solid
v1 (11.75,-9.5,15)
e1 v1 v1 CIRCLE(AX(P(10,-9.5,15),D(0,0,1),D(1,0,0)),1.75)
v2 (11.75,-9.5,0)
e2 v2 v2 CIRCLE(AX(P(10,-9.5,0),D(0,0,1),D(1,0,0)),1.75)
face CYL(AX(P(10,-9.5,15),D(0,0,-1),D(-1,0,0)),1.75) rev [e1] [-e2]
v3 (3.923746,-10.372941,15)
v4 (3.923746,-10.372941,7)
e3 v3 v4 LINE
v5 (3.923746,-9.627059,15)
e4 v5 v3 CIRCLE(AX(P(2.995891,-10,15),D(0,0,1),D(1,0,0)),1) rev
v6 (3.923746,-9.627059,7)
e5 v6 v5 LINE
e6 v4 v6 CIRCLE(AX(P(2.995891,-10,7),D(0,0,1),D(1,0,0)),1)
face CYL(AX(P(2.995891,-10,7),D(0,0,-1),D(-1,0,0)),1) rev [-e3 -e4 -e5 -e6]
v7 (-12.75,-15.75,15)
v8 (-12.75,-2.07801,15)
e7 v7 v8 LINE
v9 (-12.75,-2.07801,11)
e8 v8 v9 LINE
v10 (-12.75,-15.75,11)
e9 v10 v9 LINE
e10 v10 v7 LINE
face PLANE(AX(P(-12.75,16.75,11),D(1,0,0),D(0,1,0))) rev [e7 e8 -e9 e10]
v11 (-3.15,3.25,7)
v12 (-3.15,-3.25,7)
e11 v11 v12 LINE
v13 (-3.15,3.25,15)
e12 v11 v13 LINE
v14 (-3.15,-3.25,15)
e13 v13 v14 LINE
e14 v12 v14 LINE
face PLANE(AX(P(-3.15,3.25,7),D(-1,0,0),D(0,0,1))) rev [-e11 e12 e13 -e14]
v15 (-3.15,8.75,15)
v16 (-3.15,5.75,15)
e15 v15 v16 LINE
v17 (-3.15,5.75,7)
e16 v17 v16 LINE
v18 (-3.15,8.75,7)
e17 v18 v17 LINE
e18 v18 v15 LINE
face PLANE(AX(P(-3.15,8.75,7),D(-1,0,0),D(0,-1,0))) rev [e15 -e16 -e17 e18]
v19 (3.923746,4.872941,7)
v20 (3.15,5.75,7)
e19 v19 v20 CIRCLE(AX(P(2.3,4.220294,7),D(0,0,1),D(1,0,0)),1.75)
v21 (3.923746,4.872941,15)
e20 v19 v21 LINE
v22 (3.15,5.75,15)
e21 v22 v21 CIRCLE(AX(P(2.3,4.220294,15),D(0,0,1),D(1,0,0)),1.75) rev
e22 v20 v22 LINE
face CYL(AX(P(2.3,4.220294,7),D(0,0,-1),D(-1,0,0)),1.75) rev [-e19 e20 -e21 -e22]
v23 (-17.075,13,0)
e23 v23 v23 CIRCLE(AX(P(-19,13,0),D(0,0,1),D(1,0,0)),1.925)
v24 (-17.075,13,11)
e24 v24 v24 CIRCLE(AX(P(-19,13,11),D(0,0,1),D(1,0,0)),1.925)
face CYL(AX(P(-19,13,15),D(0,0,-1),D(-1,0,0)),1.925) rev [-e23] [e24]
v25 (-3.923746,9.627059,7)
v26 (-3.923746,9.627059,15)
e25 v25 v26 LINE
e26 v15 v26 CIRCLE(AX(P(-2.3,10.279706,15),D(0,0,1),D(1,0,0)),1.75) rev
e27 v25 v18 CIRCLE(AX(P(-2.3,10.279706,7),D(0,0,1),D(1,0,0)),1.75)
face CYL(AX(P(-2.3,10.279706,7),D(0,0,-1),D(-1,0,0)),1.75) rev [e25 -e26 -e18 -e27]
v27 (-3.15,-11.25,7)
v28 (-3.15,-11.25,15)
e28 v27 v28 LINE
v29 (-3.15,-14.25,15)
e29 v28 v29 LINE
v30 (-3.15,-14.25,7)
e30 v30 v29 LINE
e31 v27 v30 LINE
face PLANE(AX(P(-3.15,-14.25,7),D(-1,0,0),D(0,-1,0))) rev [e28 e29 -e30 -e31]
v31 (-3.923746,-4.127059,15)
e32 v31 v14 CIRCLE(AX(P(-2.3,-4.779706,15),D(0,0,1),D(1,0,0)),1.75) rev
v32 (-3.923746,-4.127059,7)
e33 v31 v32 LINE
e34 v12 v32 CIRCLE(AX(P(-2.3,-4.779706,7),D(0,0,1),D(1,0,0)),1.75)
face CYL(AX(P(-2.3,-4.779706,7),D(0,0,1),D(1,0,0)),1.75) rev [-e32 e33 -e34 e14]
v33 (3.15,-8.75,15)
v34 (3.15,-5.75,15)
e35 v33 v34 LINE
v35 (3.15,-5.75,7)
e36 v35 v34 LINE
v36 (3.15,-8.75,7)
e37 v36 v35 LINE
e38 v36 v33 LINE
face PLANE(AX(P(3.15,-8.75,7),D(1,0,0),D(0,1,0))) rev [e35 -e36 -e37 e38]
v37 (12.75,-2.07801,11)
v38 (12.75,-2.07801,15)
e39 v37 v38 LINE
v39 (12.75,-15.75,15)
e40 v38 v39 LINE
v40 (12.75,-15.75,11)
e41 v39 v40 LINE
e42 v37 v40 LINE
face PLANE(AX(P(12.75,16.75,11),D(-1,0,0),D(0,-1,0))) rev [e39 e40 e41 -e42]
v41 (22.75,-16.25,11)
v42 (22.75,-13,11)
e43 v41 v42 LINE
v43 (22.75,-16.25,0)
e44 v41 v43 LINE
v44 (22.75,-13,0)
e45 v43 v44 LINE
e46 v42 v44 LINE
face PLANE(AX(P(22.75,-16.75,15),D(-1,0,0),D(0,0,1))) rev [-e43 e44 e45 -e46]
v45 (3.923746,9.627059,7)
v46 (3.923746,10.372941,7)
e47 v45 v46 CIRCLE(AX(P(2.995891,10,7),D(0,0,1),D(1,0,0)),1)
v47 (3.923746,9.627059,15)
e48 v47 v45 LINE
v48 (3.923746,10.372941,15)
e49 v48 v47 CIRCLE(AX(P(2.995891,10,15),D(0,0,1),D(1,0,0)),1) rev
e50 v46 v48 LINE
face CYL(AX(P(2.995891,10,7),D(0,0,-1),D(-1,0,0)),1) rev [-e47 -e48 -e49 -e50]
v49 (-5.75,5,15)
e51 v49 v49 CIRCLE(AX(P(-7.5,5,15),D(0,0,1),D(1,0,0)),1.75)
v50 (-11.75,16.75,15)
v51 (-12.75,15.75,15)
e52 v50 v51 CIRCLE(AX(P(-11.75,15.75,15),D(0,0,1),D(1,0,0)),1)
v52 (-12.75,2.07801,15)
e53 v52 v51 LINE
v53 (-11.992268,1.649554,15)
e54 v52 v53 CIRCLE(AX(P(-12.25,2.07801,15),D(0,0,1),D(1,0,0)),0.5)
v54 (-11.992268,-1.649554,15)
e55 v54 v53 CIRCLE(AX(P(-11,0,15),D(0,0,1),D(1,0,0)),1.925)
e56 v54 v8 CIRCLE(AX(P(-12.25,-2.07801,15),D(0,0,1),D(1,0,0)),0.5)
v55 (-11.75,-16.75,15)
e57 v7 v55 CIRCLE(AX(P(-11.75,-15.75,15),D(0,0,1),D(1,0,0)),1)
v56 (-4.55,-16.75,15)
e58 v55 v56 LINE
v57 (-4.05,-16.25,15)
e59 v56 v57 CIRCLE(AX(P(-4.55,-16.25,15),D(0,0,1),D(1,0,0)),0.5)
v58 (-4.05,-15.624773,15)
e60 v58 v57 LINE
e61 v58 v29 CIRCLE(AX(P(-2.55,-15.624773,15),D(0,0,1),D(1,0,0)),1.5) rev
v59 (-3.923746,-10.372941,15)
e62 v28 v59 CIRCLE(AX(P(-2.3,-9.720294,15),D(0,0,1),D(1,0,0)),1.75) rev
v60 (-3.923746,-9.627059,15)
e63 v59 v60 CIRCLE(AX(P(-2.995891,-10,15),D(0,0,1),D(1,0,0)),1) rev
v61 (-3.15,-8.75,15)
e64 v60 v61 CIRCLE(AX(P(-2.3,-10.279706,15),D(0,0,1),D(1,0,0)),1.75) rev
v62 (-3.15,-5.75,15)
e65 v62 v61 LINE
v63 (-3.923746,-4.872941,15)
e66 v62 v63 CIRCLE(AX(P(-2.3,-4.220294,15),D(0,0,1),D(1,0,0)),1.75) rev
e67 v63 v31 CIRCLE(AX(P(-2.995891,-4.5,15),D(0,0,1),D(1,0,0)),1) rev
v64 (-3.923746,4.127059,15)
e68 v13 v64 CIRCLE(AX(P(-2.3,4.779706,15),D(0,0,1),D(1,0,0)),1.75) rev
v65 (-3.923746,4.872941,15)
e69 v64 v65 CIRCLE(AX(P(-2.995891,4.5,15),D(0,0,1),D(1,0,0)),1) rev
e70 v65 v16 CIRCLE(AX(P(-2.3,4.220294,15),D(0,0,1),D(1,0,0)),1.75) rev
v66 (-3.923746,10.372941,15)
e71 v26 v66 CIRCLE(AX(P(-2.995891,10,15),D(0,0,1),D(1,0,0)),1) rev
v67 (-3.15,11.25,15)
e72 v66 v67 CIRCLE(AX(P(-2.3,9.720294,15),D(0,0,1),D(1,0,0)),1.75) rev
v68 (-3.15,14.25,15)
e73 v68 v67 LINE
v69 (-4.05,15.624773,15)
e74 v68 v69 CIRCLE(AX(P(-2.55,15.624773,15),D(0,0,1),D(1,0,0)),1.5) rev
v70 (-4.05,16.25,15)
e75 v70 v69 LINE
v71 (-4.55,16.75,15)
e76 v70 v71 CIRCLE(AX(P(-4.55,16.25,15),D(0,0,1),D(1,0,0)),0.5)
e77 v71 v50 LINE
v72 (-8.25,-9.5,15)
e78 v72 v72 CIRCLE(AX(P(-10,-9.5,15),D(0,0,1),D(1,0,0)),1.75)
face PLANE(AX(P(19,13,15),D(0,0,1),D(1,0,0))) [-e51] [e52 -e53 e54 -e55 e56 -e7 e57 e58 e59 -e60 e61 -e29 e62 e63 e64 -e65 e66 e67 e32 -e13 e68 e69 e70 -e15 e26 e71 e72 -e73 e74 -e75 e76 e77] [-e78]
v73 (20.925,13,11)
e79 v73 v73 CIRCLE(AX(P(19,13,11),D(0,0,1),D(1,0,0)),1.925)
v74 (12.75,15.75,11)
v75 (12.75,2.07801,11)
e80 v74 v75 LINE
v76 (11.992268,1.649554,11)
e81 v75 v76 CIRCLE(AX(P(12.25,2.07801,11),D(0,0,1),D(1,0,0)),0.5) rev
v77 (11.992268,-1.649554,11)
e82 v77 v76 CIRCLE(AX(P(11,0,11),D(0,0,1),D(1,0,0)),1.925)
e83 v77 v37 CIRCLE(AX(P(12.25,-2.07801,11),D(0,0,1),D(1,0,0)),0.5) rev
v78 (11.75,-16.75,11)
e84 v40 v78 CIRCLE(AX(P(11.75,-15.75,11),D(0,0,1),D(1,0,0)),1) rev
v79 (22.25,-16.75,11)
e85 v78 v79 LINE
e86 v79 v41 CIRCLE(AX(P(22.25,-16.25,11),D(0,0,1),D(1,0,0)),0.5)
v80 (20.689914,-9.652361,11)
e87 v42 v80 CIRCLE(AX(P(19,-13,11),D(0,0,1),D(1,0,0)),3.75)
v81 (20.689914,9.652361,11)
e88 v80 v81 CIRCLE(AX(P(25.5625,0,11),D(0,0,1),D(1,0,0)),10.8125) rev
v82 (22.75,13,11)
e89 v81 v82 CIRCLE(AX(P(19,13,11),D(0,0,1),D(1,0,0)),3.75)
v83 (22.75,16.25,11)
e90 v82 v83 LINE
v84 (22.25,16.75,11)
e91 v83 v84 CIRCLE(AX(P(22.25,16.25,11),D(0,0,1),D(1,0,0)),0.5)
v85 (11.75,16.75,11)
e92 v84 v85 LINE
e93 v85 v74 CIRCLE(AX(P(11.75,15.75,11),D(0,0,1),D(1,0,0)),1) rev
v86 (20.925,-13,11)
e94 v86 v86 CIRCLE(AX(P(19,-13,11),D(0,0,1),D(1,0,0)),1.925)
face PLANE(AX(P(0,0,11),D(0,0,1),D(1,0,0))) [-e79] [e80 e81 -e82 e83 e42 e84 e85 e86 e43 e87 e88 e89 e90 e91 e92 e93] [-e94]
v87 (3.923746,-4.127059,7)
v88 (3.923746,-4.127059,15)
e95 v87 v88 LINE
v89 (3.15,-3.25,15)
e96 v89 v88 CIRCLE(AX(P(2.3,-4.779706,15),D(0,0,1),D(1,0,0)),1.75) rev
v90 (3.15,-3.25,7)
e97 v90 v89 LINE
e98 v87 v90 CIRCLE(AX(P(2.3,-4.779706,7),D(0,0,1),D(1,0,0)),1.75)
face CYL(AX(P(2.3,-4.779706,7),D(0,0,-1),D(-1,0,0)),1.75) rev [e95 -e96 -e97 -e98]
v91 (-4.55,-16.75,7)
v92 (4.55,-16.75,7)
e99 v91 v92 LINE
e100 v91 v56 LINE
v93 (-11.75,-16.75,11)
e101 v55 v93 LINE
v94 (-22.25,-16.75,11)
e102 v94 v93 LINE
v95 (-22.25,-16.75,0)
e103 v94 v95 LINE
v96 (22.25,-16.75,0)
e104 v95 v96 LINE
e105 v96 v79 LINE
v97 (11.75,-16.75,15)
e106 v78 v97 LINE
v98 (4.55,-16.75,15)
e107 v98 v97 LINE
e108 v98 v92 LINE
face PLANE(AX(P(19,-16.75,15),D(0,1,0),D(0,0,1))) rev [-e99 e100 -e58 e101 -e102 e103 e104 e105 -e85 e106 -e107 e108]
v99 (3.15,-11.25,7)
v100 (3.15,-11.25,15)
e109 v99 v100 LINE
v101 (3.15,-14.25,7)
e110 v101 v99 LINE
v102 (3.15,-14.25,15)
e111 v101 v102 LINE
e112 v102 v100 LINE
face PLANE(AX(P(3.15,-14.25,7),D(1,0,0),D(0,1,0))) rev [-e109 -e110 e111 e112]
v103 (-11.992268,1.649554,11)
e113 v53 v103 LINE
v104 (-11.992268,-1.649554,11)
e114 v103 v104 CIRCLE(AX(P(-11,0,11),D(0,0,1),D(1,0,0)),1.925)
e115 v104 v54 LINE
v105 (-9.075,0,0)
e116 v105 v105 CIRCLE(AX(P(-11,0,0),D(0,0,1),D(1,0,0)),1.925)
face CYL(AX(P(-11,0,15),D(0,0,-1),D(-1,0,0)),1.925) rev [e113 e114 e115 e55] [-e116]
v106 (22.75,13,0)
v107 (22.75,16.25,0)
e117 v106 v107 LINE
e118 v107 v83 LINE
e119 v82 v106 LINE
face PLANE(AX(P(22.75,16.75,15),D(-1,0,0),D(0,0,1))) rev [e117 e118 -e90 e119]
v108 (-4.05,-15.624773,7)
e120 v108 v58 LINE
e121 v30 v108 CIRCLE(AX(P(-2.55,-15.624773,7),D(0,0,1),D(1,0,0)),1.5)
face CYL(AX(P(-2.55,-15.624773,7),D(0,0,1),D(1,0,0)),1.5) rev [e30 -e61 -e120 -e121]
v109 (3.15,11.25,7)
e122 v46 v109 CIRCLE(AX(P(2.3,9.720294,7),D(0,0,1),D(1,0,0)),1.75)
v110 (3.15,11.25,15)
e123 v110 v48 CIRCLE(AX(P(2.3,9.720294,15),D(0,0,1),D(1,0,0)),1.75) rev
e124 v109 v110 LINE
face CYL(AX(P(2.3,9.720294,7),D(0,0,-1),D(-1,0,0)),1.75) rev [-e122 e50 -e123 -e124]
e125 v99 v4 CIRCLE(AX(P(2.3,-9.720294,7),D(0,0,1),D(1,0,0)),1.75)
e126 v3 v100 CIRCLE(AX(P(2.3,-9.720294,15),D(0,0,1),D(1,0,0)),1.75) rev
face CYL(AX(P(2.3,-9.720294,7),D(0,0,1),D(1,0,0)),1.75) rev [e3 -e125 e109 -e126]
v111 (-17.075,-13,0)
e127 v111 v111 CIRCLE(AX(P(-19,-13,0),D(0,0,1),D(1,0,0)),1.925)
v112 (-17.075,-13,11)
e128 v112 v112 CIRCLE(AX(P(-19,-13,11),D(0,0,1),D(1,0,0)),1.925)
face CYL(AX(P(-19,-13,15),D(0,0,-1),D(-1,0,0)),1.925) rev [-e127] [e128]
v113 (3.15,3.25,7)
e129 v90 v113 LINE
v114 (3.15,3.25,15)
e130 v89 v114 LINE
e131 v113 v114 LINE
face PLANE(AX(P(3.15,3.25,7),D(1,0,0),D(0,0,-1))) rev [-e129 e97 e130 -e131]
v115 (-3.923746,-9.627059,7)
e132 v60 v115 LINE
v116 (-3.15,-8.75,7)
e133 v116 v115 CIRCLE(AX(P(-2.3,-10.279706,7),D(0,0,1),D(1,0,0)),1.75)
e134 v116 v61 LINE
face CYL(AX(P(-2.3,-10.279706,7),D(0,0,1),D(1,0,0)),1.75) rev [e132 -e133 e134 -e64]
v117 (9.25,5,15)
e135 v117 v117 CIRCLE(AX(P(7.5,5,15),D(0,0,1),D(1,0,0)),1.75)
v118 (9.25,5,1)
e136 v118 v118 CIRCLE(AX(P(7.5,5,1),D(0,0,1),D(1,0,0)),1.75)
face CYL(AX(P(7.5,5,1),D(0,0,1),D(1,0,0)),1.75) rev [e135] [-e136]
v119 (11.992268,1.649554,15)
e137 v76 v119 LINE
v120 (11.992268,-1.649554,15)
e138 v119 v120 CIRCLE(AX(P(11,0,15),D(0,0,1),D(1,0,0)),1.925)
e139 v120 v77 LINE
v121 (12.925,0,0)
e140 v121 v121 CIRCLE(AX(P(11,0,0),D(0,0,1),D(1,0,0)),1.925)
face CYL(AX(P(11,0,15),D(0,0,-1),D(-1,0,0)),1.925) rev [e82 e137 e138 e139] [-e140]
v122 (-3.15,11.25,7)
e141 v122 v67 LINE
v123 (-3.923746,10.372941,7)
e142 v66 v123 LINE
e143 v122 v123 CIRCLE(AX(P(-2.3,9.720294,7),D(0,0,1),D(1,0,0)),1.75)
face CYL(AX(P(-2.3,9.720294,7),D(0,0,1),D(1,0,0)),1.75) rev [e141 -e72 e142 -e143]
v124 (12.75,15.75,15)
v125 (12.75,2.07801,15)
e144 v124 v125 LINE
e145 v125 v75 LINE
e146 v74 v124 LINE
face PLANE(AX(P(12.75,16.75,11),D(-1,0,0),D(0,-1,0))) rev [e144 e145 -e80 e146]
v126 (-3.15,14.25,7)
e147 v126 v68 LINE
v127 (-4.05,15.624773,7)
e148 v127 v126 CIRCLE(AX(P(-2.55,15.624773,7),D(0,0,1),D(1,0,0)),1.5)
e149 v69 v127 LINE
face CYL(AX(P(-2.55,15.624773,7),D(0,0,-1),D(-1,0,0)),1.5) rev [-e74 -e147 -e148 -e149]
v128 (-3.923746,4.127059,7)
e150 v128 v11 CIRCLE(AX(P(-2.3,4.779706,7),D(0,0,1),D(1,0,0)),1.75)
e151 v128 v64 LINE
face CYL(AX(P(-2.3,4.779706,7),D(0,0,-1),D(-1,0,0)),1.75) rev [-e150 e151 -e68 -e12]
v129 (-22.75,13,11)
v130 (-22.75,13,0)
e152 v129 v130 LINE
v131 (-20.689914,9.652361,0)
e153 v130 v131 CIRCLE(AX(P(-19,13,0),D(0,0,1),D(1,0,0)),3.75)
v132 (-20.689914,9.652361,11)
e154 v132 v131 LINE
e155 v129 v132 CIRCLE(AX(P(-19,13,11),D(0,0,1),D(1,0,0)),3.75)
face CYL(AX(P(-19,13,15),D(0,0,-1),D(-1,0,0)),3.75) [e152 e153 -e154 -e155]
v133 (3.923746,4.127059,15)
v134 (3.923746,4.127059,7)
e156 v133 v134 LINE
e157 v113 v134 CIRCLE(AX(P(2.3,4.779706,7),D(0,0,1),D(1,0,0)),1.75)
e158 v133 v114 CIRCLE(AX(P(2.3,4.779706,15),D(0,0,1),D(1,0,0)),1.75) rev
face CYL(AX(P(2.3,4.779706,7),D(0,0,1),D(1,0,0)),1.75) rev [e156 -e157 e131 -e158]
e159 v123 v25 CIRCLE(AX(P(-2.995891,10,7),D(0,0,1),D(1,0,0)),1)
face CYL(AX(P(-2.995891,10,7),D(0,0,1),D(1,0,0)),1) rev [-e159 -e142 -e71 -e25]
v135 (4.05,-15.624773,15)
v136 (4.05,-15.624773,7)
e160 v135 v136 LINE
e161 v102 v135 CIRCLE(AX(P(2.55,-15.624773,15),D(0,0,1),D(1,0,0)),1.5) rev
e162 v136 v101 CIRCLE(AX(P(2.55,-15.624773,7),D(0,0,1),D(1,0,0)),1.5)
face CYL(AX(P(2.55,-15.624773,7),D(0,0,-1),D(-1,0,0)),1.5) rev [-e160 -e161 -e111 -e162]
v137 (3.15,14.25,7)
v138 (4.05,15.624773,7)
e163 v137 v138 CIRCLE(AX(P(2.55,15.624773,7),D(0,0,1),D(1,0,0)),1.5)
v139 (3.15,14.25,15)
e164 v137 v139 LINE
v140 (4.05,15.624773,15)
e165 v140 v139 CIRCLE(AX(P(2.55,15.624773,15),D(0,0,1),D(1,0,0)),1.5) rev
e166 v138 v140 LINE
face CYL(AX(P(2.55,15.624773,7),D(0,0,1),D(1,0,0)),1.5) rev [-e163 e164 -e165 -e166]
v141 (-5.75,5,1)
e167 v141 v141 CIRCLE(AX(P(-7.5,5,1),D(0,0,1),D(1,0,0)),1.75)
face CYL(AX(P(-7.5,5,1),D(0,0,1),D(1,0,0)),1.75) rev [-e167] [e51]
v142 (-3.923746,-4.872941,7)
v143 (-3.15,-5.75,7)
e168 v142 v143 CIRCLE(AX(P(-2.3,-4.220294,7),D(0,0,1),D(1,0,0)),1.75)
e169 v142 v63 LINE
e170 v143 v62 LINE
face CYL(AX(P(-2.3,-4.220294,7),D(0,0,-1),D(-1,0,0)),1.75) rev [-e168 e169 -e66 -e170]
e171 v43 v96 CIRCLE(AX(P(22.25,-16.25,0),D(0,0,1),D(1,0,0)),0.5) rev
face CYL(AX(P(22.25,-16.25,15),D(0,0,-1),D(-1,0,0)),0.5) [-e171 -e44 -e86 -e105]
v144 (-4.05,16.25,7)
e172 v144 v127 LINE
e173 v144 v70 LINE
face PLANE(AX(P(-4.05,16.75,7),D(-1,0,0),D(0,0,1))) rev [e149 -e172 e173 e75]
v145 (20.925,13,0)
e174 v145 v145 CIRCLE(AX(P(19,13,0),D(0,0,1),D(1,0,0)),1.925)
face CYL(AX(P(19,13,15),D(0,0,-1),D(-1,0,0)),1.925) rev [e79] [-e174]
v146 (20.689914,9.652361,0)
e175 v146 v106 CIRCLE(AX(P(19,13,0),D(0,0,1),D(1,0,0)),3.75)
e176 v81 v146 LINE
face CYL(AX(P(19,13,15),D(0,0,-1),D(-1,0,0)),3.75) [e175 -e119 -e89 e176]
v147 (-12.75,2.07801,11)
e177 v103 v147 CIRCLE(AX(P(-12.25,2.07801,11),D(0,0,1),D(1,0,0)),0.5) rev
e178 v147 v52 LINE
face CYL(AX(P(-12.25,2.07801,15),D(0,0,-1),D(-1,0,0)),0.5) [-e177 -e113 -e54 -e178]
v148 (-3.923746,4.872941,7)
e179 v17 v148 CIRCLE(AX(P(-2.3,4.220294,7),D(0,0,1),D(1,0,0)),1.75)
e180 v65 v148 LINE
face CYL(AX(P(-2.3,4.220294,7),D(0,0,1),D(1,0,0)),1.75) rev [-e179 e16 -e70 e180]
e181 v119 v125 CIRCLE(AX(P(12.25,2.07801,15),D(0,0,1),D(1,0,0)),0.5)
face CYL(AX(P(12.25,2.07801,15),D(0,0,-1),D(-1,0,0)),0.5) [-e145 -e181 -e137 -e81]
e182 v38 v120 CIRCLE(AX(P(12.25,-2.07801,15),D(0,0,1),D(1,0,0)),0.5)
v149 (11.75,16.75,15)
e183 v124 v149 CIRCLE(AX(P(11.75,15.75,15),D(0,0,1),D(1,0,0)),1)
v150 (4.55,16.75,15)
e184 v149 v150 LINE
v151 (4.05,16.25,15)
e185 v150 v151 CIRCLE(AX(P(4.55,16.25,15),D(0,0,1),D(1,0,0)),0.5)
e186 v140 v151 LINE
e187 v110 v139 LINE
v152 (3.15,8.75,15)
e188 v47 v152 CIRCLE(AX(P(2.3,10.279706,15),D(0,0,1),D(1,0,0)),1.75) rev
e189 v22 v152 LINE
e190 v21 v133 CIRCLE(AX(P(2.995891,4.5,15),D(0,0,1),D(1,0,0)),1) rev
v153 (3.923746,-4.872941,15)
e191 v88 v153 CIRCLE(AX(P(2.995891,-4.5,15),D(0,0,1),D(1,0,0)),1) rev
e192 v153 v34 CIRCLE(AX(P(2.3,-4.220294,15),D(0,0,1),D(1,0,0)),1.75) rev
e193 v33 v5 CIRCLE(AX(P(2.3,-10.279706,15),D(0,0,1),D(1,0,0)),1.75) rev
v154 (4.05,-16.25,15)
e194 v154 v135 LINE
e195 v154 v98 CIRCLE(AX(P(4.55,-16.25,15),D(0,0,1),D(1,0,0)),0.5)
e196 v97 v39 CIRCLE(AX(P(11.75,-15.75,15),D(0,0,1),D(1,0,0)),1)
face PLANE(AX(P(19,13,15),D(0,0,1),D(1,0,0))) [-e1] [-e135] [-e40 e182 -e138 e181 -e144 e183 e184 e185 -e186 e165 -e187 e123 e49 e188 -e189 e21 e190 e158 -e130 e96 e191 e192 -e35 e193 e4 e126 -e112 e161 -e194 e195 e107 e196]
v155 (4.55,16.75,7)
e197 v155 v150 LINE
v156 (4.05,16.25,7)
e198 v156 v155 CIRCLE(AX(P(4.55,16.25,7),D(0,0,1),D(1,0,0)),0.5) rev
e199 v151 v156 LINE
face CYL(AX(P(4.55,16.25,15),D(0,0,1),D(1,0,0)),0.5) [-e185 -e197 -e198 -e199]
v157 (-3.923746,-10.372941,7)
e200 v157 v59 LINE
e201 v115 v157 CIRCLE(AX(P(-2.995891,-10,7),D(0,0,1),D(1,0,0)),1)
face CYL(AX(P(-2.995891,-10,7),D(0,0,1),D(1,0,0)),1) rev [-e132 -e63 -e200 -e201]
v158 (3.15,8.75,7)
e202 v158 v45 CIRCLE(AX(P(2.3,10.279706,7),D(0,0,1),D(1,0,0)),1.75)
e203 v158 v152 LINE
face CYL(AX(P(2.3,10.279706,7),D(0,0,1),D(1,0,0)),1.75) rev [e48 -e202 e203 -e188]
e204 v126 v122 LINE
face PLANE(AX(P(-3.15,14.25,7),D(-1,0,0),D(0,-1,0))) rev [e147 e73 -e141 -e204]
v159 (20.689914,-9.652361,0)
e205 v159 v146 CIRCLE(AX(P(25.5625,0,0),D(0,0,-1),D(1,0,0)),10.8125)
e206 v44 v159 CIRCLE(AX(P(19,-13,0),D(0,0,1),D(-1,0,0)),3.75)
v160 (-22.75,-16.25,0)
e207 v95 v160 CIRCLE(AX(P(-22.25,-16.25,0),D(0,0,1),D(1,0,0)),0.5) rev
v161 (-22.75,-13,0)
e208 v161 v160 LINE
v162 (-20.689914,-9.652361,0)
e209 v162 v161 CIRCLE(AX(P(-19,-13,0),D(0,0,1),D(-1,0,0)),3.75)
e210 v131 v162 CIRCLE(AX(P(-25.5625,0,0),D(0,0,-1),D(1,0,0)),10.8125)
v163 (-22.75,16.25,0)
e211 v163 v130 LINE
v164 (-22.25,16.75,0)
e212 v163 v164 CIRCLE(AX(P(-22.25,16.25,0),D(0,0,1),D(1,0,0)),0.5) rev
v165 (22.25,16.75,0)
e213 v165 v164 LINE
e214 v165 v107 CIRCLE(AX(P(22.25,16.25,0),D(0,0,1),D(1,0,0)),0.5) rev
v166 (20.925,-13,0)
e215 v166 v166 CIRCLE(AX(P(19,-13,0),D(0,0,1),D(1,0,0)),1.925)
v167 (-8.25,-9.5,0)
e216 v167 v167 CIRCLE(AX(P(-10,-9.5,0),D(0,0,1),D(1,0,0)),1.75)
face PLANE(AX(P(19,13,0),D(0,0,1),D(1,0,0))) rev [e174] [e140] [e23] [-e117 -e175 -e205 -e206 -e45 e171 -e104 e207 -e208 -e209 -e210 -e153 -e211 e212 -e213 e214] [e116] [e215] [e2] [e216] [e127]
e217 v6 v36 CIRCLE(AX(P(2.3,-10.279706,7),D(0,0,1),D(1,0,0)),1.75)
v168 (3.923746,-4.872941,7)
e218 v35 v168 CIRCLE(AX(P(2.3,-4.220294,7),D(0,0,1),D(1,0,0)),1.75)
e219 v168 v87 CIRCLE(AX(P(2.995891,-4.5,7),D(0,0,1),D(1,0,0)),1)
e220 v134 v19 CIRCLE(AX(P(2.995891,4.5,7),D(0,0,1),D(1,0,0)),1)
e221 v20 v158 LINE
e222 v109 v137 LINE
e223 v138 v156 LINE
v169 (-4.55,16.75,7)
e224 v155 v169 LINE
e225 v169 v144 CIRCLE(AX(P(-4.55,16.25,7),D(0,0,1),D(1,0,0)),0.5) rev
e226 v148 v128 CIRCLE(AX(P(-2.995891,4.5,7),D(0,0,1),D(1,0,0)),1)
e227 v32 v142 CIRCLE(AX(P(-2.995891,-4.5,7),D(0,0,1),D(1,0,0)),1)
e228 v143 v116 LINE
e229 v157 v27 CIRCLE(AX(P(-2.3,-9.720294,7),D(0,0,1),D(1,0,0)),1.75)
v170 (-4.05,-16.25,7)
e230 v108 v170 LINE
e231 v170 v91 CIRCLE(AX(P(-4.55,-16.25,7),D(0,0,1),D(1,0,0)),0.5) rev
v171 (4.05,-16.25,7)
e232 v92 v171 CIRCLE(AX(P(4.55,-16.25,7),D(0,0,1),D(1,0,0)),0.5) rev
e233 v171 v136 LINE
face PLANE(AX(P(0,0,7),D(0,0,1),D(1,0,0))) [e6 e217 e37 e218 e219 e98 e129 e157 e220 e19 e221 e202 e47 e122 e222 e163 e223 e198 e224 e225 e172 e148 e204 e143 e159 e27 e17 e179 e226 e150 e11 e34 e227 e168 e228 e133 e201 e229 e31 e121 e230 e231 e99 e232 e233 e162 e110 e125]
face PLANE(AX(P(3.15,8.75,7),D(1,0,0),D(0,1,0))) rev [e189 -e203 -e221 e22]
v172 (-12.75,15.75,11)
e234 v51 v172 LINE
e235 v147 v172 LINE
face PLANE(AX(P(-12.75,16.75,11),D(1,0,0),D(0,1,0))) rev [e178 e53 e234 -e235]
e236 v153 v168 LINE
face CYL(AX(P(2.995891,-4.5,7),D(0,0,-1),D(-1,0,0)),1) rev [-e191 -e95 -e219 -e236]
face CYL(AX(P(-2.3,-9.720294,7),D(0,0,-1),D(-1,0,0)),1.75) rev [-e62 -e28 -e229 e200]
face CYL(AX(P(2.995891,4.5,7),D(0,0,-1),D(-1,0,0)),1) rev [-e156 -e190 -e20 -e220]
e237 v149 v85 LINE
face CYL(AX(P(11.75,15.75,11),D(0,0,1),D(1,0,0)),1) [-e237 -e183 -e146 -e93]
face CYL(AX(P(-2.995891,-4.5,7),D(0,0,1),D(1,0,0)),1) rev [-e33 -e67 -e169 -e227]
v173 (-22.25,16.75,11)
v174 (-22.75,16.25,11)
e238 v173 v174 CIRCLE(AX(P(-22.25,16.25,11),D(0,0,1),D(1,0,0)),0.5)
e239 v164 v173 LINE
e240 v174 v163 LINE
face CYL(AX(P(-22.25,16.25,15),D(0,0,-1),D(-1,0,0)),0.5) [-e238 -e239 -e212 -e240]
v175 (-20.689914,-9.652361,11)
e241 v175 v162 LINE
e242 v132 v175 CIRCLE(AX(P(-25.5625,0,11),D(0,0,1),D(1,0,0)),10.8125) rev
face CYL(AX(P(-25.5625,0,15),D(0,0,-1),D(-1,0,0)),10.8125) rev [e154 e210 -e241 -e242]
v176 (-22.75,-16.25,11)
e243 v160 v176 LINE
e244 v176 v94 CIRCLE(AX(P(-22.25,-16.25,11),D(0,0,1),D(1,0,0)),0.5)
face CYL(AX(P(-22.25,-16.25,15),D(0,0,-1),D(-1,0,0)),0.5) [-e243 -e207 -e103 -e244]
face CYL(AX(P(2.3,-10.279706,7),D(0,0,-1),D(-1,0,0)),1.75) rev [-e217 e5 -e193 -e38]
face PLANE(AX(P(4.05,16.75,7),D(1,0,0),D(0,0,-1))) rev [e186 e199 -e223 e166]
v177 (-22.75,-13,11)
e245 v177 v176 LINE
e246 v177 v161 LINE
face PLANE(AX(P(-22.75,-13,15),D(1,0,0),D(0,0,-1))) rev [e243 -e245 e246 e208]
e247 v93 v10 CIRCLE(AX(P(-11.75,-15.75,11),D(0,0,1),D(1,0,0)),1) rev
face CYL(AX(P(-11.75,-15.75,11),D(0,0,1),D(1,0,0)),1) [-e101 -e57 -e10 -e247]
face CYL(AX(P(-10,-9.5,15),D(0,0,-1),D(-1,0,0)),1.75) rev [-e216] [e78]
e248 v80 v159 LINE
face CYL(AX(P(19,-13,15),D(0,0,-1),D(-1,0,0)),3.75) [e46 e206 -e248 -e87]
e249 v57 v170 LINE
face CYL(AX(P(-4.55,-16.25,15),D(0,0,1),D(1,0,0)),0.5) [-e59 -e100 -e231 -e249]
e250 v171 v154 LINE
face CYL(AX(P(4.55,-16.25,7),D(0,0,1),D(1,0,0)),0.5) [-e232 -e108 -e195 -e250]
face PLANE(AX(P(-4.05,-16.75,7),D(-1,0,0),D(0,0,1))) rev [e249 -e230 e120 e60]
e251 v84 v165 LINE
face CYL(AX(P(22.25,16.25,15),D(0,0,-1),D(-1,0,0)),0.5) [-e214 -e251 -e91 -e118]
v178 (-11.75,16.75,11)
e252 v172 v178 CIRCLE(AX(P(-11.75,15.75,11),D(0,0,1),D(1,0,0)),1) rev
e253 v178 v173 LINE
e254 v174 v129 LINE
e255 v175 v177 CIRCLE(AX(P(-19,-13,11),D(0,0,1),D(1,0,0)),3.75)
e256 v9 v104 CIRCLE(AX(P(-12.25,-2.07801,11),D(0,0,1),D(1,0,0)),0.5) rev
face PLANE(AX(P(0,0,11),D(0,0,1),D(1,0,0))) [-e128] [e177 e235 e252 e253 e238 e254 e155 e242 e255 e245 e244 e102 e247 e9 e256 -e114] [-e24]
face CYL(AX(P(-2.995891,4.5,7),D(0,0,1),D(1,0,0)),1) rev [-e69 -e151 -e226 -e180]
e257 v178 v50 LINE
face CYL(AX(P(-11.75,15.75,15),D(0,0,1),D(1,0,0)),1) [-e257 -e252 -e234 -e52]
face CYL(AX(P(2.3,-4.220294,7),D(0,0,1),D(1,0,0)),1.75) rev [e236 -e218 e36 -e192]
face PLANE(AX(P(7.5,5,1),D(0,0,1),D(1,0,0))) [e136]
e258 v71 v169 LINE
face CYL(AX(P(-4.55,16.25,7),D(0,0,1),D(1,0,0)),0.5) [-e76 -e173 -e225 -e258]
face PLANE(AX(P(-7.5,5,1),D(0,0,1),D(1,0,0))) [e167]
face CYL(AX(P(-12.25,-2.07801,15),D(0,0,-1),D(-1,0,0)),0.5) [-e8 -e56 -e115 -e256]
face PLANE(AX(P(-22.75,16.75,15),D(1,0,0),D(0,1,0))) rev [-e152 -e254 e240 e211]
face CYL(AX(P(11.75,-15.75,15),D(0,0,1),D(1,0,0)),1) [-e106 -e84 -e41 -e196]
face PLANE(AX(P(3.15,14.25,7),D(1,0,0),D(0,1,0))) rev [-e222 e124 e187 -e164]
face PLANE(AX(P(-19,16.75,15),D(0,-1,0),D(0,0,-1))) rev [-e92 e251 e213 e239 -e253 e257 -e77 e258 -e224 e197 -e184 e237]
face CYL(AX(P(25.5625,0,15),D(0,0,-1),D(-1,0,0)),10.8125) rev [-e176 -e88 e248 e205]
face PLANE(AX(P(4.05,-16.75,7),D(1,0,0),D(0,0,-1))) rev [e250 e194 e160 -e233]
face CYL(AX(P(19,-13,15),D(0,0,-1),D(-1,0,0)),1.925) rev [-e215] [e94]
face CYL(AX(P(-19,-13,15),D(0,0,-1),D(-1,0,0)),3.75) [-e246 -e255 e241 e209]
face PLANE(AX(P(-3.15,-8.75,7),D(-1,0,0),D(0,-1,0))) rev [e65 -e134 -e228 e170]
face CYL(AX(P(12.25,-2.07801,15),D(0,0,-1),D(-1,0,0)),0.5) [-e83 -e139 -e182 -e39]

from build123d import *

# Parameters (mm, degrees)
SKETCH1_R           = 1.75
SKETCH1_R_2         = 1.925
BOSS_EXTRUDE1_DEPTH = 15
CUT_EXTRUDE1_DEPTH  = 8
SKETCH5_W           = 11
SKETCH5_H           = 33.5
CUT_EXTRUDE6_DEPTH  = 4
SKETCH8_R           = 1.75
CUT_EXTRUDE9_DEPTH  = 14
FILLET1_R           = 1.75
FILLET2_R           = 1
FILLET3_R           = 0.5
FILLET4_R           = 1.5


with BuildPart() as part:
    # Sketch1 → Boss-Extrude1 (new body)
    with BuildSketch(Plane.XY):
        with BuildLine():
            Line((-19, 16.75), (19, 16.75))
            Line((19, 16.75), (22.75, 16.75))
            Line((22.75, 16.75), (22.75, 13))
            ThreePointArc((22.75, 13), (22.193718688, 11.034634654), (20.689914163, 9.652360515))
            ThreePointArc((20.689914163, 9.652360515), (14.75, 0), (20.689914163, -9.652360515))
            ThreePointArc((20.689914163, -9.652360515), (22.193718688, -11.034634654), (22.75, -13))
            Line((22.75, -13), (22.75, -16.75))
            Line((22.75, -16.75), (19, -16.75))
            Line((19, -16.75), (-19, -16.75))
            Line((-19, -16.75), (-22.75, -16.75))
            Line((-22.75, -16.75), (-22.75, -13))
            ThreePointArc((-22.75, -13), (-22.193718688, -11.034634654), (-20.689914163, -9.652360515))
            ThreePointArc((-20.689914163, -9.652360515), (-14.75, 0), (-20.689914163, 9.652360515))
            ThreePointArc((-20.689914163, 9.652360515), (-22.193718688, 11.034634654), (-22.75, 13))
            Line((-22.75, 13), (-22.75, 16.75))
            Line((-22.75, 16.75), (-19, 16.75))
        make_face()
        with Locations((-10, -9.5)):
            Circle(SKETCH1_R, mode=Mode.SUBTRACT)
        with Locations((10, -9.5)):
            Circle(SKETCH1_R, mode=Mode.SUBTRACT)
        with Locations((19, 13)):
            Circle(SKETCH1_R_2, mode=Mode.SUBTRACT)
        with Locations((-19, 13)):
            Circle(SKETCH1_R_2, mode=Mode.SUBTRACT)
        with Locations((-19, -13)):
            Circle(SKETCH1_R_2, mode=Mode.SUBTRACT)
        with Locations((19, -13)):
            Circle(SKETCH1_R_2, mode=Mode.SUBTRACT)
        with Locations((-11, 0)):
            Circle(SKETCH1_R_2, mode=Mode.SUBTRACT)
        with Locations((11, 0)):
            Circle(SKETCH1_R_2, mode=Mode.SUBTRACT)
    extrude(amount=BOSS_EXTRUDE1_DEPTH)

    # Sketch2 → Cut-Extrude1 (cut)
    with BuildSketch(Plane.XY.offset(15)):
        Polygon((-4.049999999, 16.75), (-4.049999999, 14.25), (-3.149999999, 14.25), (-3.149999999, 11.25), (-4.049999999, 11.25), (-4.049999999, 8.75), (-3.149999999, 8.75), (-3.149999999, 5.75), (-4.049999999, 5.75), (-4.049999999, 3.25), (-3.149999999, 3.25), (-3.149999999, -3.25), (-4.049999999, -3.25), (-4.049999999, -5.75), (-3.149999999, -5.75), (-3.149999999, -8.75), (-4.049999999, -8.75), (-4.049999999, -11.25), (-3.149999999, -11.25), (-3.149999999, -14.25), (-4.049999999, -14.25), (-4.049999999, -16.75), (4.050000001, -16.75), (4.050000001, -14.25), (3.150000001, -14.25), (3.150000001, -11.25), (4.050000001, -11.25), (4.050000001, -8.75), (3.150000001, -8.75), (3.150000001, -5.75), (4.050000001, -5.75), (4.050000001, -3.25), (3.150000001, -3.25), (3.150000001, 3.25), (4.050000001, 3.25), (4.050000001, 5.75), (3.150000001, 5.75), (3.150000001, 8.75), (4.050000001, 8.75), (4.050000001, 11.25), (3.150000001, 11.25), (3.150000001, 14.25), (4.050000001, 14.25), (4.050000001, 16.75), align=None)
    extrude(amount=-CUT_EXTRUDE1_DEPTH, mode=Mode.SUBTRACT)

    # Sketch5 → Cut-Extrude6 (cut)
    with BuildSketch(Plane.XY.offset(15)):
        with Locations((-18.25, 0)):
            Rectangle(SKETCH5_W, SKETCH5_H)
        with Locations((18.25, 0)):
            Rectangle(SKETCH5_W, SKETCH5_H)
    extrude(amount=-CUT_EXTRUDE6_DEPTH, mode=Mode.SUBTRACT)

    # Sketch8 → Cut-Extrude9 (cut)
    with BuildSketch(Plane.XY.offset(15)):
        with Locations((7.5, 5)):
            Circle(SKETCH8_R)
        with Locations((-7.5, 5)):
            Circle(SKETCH8_R)
    extrude(amount=-CUT_EXTRUDE9_DEPTH, mode=Mode.SUBTRACT)

    # Fillet1
    # the kernel refuses this fillet: 1.75 mm, written as the material it adds along each edge
    with BuildSketch(Plane(origin=(-4.049999999, 11.25, 15), x_dir=(1, 0, 0), z_dir=(0, 0, -1)), Plane(origin=(-4.049999999, 5.75, 15), x_dir=(1, 0, 0), z_dir=(0, 0, -1)), Plane(origin=(-4.049999999, -3.25, 15), x_dir=(1, 0, 0), z_dir=(0, 0, -1)), Plane(origin=(-4.049999999, -8.75, 15), x_dir=(1, 0, 0), z_dir=(0, 0, -1)), Plane(origin=(4.050000001, -11.25, 15), x_dir=(-1, 0, 0), z_dir=(0, 0, -1))) as fillet1_piece_1:
        with BuildLine():
            CenterArc((1.75, 1.529705854), FILLET1_R, 180, 60.940718932)
            Line((0, 1.529705854), (-0.035, 1.529705854))
            Line((-0.035, 1.529705854), (-0.035, 0))
            Line((-0.035, 0), (0, -0.035))
            ThreePointArc((0, -0.035), (0.45, -0.035), (0.883, -0.030594117))
            Line((0.883, -0.030594117), (0.9, 0))
        make_face()
    extrude(amount=11.824264635)
    with BuildSketch(Plane(origin=(4.050000001, 11.25, 15), x_dir=(-1, 0, 0), z_dir=(0, 0, -1)), Plane(origin=(4.050000001, 5.75, 15), x_dir=(-1, 0, 0), z_dir=(0, 0, -1)), Plane(origin=(4.050000001, -3.25, 15), x_dir=(-1, 0, 0), z_dir=(0, 0, -1))) as fillet1_piece_2:
        with BuildLine():
            CenterArc((1.75, -1.529705854), FILLET1_R, 119.059281068, 60.940718932)
            Line((0, -1.529705854), (-0.035, -1.529705854))
            Line((-0.035, -1.529705854), (-0.035, 0))
            Line((-0.035, 0), (0, 0.035))
            ThreePointArc((0, 0.035), (0.45, 0.035), (0.883, 0.030594117))
            Line((0.883, 0.030594117), (0.9, 0))
        make_face()
    extrude(amount=11.824264635)
    with BuildSketch(Plane(origin=(4.050000001, -8.75, 15), x_dir=(0, -1, 0), z_dir=(0, 0, -1)), Plane(origin=(-4.049999999, 8.75, 15), x_dir=(0, 1, 0), z_dir=(0, 0, -1)), Plane(origin=(-4.049999999, 3.25, 15), x_dir=(0, 1, 0), z_dir=(0, 0, -1)), Plane(origin=(-4.049999999, -5.75, 15), x_dir=(0, 1, 0), z_dir=(0, 0, -1)), Plane(origin=(-4.049999999, -11.25, 15), x_dir=(0, 1, 0), z_dir=(0, 0, -1))) as fillet1_piece_3:
        with BuildLine():
            CenterArc((1.529705854, 1.75), FILLET1_R, 209.059281068, 60.940718932)
            Line((0, 0.9), (-0.030594117, 0.883))
            ThreePointArc((-0.030594117, 0.883), (-0.035, 0.45), (-0.035, 0))
            Line((-0.035, 0), (0, -0.035))
            Line((0, -0.035), (1.529705854, -0.035))
            Line((1.529705854, -0.035), (1.529705854, 0))
        make_face()
    extrude(amount=11.824264635)
    with BuildSketch(Plane(origin=(4.050000001, -5.75, 15), x_dir=(0, 1, 0), z_dir=(0, 0, -1)), Plane(origin=(4.050000001, 3.25, 15), x_dir=(0, 1, 0), z_dir=(0, 0, -1)), Plane(origin=(4.050000001, 8.75, 15), x_dir=(0, 1, 0), z_dir=(0, 0, -1))) as fillet1_piece_4:
        with BuildLine():
            CenterArc((1.529705854, -1.75), FILLET1_R, 90, 60.940718932)
            Line((0, -0.9), (-0.030594117, -0.883))
            ThreePointArc((-0.030594117, -0.883), (-0.035, -0.45), (-0.035, 0))
            Line((-0.035, 0), (0, 0.035))
            Line((0, 0.035), (1.529705854, 0.035))
            Line((1.529705854, 0.035), (1.529705854, 0))
        make_face()
    extrude(amount=11.824264635)

    # Fillet2
    fillet2_edges = [part.edges().sort_by_distance(p)[0] for p in [
        (-12.75, -16.75, 13),
        (-12.75, 16.75, 13),
        (12.75, 16.75, 13),
        (12.75, -16.75, 13),
        (-4.027502426, 10, 11),
        (-4.027502426, 4.5, 11),
        (-4.027502426, -4.5, 11),
        (-4.027502426, -10, 11),
        (4.027502428, 10, 11),
        (4.027502428, 4.5, 11),
        (4.027502428, -4.5, 11),
        (4.027502428, -10, 11),
    ]]
    fillet(fillet2_edges, radius=FILLET2_R)

    # Fillet3
    fillet3_edges = [part.edges().sort_by_distance(p)[0] for p in [
        (-4.049999999, 16.75, 11),
        (4.050000001, 16.75, 11),
        (4.050000001, -16.75, 11),
        (-4.049999999, -16.75, 11),
        (-12.75, 0.801950747, 13),
        (-12.75, -0.801950747, 13),
        (-22.75, -16.75, 5.5),
        (-22.75, 16.75, 5.5),
        (12.75, -0.801950747, 13),
        (12.75, 0.801950747, 13),
        (22.75, -16.75, 5.5),
        (22.75, 16.75, 5.5),
    ]]
    fillet(fillet3_edges, radius=FILLET3_R)

    # Fillet4
    # the kernel refuses this fillet: 1.5 mm, written as the material it adds along each edge
    with BuildSketch(Plane(origin=(-4.049999999, 14.25, 15), x_dir=(1, 0, 0), z_dir=(0, 0, -1)), Plane(origin=(4.050000001, -14.25, 15), x_dir=(-1, 0, 0), z_dir=(0, 0, -1))) as fillet4_piece_1:
        with BuildLine():
            CenterArc((1.5, -1.374772708), FILLET4_R, 113.578178478, 66.421821522)
            Line((0, -1.374772708), (-0.03, -1.374772708))
            Line((-0.03, -1.374772708), (-0.03, 0))
            Line((-0.03, 0), (0, 0.03))
            ThreePointArc((0, 0.03), (0.45, 0.03), (0.888, 0.027495454))
            Line((0.888, 0.027495454), (0.9, 0))
        make_face()
    extrude(amount=11.436931771)
    with BuildSketch(Plane(origin=(4.050000001, 14.25, 15), x_dir=(-1, 0, 0), z_dir=(0, 0, -1)), Plane(origin=(-4.049999999, -14.25, 15), x_dir=(1, 0, 0), z_dir=(0, 0, -1))) as fillet4_piece_2:
        with BuildLine():
            CenterArc((1.5, 1.374772708), FILLET4_R, 180, 66.421821522)
            Line((0, 1.374772708), (-0.03, 1.374772708))
            Line((-0.03, 1.374772708), (-0.03, 0))
            Line((-0.03, 0), (0, -0.03))
            ThreePointArc((0, -0.03), (0.45, -0.03), (0.888, -0.027495454))
            Line((0.888, -0.027495454), (0.9, 0))
        make_face()
    extrude(amount=11.436931771)


solid = part.part
